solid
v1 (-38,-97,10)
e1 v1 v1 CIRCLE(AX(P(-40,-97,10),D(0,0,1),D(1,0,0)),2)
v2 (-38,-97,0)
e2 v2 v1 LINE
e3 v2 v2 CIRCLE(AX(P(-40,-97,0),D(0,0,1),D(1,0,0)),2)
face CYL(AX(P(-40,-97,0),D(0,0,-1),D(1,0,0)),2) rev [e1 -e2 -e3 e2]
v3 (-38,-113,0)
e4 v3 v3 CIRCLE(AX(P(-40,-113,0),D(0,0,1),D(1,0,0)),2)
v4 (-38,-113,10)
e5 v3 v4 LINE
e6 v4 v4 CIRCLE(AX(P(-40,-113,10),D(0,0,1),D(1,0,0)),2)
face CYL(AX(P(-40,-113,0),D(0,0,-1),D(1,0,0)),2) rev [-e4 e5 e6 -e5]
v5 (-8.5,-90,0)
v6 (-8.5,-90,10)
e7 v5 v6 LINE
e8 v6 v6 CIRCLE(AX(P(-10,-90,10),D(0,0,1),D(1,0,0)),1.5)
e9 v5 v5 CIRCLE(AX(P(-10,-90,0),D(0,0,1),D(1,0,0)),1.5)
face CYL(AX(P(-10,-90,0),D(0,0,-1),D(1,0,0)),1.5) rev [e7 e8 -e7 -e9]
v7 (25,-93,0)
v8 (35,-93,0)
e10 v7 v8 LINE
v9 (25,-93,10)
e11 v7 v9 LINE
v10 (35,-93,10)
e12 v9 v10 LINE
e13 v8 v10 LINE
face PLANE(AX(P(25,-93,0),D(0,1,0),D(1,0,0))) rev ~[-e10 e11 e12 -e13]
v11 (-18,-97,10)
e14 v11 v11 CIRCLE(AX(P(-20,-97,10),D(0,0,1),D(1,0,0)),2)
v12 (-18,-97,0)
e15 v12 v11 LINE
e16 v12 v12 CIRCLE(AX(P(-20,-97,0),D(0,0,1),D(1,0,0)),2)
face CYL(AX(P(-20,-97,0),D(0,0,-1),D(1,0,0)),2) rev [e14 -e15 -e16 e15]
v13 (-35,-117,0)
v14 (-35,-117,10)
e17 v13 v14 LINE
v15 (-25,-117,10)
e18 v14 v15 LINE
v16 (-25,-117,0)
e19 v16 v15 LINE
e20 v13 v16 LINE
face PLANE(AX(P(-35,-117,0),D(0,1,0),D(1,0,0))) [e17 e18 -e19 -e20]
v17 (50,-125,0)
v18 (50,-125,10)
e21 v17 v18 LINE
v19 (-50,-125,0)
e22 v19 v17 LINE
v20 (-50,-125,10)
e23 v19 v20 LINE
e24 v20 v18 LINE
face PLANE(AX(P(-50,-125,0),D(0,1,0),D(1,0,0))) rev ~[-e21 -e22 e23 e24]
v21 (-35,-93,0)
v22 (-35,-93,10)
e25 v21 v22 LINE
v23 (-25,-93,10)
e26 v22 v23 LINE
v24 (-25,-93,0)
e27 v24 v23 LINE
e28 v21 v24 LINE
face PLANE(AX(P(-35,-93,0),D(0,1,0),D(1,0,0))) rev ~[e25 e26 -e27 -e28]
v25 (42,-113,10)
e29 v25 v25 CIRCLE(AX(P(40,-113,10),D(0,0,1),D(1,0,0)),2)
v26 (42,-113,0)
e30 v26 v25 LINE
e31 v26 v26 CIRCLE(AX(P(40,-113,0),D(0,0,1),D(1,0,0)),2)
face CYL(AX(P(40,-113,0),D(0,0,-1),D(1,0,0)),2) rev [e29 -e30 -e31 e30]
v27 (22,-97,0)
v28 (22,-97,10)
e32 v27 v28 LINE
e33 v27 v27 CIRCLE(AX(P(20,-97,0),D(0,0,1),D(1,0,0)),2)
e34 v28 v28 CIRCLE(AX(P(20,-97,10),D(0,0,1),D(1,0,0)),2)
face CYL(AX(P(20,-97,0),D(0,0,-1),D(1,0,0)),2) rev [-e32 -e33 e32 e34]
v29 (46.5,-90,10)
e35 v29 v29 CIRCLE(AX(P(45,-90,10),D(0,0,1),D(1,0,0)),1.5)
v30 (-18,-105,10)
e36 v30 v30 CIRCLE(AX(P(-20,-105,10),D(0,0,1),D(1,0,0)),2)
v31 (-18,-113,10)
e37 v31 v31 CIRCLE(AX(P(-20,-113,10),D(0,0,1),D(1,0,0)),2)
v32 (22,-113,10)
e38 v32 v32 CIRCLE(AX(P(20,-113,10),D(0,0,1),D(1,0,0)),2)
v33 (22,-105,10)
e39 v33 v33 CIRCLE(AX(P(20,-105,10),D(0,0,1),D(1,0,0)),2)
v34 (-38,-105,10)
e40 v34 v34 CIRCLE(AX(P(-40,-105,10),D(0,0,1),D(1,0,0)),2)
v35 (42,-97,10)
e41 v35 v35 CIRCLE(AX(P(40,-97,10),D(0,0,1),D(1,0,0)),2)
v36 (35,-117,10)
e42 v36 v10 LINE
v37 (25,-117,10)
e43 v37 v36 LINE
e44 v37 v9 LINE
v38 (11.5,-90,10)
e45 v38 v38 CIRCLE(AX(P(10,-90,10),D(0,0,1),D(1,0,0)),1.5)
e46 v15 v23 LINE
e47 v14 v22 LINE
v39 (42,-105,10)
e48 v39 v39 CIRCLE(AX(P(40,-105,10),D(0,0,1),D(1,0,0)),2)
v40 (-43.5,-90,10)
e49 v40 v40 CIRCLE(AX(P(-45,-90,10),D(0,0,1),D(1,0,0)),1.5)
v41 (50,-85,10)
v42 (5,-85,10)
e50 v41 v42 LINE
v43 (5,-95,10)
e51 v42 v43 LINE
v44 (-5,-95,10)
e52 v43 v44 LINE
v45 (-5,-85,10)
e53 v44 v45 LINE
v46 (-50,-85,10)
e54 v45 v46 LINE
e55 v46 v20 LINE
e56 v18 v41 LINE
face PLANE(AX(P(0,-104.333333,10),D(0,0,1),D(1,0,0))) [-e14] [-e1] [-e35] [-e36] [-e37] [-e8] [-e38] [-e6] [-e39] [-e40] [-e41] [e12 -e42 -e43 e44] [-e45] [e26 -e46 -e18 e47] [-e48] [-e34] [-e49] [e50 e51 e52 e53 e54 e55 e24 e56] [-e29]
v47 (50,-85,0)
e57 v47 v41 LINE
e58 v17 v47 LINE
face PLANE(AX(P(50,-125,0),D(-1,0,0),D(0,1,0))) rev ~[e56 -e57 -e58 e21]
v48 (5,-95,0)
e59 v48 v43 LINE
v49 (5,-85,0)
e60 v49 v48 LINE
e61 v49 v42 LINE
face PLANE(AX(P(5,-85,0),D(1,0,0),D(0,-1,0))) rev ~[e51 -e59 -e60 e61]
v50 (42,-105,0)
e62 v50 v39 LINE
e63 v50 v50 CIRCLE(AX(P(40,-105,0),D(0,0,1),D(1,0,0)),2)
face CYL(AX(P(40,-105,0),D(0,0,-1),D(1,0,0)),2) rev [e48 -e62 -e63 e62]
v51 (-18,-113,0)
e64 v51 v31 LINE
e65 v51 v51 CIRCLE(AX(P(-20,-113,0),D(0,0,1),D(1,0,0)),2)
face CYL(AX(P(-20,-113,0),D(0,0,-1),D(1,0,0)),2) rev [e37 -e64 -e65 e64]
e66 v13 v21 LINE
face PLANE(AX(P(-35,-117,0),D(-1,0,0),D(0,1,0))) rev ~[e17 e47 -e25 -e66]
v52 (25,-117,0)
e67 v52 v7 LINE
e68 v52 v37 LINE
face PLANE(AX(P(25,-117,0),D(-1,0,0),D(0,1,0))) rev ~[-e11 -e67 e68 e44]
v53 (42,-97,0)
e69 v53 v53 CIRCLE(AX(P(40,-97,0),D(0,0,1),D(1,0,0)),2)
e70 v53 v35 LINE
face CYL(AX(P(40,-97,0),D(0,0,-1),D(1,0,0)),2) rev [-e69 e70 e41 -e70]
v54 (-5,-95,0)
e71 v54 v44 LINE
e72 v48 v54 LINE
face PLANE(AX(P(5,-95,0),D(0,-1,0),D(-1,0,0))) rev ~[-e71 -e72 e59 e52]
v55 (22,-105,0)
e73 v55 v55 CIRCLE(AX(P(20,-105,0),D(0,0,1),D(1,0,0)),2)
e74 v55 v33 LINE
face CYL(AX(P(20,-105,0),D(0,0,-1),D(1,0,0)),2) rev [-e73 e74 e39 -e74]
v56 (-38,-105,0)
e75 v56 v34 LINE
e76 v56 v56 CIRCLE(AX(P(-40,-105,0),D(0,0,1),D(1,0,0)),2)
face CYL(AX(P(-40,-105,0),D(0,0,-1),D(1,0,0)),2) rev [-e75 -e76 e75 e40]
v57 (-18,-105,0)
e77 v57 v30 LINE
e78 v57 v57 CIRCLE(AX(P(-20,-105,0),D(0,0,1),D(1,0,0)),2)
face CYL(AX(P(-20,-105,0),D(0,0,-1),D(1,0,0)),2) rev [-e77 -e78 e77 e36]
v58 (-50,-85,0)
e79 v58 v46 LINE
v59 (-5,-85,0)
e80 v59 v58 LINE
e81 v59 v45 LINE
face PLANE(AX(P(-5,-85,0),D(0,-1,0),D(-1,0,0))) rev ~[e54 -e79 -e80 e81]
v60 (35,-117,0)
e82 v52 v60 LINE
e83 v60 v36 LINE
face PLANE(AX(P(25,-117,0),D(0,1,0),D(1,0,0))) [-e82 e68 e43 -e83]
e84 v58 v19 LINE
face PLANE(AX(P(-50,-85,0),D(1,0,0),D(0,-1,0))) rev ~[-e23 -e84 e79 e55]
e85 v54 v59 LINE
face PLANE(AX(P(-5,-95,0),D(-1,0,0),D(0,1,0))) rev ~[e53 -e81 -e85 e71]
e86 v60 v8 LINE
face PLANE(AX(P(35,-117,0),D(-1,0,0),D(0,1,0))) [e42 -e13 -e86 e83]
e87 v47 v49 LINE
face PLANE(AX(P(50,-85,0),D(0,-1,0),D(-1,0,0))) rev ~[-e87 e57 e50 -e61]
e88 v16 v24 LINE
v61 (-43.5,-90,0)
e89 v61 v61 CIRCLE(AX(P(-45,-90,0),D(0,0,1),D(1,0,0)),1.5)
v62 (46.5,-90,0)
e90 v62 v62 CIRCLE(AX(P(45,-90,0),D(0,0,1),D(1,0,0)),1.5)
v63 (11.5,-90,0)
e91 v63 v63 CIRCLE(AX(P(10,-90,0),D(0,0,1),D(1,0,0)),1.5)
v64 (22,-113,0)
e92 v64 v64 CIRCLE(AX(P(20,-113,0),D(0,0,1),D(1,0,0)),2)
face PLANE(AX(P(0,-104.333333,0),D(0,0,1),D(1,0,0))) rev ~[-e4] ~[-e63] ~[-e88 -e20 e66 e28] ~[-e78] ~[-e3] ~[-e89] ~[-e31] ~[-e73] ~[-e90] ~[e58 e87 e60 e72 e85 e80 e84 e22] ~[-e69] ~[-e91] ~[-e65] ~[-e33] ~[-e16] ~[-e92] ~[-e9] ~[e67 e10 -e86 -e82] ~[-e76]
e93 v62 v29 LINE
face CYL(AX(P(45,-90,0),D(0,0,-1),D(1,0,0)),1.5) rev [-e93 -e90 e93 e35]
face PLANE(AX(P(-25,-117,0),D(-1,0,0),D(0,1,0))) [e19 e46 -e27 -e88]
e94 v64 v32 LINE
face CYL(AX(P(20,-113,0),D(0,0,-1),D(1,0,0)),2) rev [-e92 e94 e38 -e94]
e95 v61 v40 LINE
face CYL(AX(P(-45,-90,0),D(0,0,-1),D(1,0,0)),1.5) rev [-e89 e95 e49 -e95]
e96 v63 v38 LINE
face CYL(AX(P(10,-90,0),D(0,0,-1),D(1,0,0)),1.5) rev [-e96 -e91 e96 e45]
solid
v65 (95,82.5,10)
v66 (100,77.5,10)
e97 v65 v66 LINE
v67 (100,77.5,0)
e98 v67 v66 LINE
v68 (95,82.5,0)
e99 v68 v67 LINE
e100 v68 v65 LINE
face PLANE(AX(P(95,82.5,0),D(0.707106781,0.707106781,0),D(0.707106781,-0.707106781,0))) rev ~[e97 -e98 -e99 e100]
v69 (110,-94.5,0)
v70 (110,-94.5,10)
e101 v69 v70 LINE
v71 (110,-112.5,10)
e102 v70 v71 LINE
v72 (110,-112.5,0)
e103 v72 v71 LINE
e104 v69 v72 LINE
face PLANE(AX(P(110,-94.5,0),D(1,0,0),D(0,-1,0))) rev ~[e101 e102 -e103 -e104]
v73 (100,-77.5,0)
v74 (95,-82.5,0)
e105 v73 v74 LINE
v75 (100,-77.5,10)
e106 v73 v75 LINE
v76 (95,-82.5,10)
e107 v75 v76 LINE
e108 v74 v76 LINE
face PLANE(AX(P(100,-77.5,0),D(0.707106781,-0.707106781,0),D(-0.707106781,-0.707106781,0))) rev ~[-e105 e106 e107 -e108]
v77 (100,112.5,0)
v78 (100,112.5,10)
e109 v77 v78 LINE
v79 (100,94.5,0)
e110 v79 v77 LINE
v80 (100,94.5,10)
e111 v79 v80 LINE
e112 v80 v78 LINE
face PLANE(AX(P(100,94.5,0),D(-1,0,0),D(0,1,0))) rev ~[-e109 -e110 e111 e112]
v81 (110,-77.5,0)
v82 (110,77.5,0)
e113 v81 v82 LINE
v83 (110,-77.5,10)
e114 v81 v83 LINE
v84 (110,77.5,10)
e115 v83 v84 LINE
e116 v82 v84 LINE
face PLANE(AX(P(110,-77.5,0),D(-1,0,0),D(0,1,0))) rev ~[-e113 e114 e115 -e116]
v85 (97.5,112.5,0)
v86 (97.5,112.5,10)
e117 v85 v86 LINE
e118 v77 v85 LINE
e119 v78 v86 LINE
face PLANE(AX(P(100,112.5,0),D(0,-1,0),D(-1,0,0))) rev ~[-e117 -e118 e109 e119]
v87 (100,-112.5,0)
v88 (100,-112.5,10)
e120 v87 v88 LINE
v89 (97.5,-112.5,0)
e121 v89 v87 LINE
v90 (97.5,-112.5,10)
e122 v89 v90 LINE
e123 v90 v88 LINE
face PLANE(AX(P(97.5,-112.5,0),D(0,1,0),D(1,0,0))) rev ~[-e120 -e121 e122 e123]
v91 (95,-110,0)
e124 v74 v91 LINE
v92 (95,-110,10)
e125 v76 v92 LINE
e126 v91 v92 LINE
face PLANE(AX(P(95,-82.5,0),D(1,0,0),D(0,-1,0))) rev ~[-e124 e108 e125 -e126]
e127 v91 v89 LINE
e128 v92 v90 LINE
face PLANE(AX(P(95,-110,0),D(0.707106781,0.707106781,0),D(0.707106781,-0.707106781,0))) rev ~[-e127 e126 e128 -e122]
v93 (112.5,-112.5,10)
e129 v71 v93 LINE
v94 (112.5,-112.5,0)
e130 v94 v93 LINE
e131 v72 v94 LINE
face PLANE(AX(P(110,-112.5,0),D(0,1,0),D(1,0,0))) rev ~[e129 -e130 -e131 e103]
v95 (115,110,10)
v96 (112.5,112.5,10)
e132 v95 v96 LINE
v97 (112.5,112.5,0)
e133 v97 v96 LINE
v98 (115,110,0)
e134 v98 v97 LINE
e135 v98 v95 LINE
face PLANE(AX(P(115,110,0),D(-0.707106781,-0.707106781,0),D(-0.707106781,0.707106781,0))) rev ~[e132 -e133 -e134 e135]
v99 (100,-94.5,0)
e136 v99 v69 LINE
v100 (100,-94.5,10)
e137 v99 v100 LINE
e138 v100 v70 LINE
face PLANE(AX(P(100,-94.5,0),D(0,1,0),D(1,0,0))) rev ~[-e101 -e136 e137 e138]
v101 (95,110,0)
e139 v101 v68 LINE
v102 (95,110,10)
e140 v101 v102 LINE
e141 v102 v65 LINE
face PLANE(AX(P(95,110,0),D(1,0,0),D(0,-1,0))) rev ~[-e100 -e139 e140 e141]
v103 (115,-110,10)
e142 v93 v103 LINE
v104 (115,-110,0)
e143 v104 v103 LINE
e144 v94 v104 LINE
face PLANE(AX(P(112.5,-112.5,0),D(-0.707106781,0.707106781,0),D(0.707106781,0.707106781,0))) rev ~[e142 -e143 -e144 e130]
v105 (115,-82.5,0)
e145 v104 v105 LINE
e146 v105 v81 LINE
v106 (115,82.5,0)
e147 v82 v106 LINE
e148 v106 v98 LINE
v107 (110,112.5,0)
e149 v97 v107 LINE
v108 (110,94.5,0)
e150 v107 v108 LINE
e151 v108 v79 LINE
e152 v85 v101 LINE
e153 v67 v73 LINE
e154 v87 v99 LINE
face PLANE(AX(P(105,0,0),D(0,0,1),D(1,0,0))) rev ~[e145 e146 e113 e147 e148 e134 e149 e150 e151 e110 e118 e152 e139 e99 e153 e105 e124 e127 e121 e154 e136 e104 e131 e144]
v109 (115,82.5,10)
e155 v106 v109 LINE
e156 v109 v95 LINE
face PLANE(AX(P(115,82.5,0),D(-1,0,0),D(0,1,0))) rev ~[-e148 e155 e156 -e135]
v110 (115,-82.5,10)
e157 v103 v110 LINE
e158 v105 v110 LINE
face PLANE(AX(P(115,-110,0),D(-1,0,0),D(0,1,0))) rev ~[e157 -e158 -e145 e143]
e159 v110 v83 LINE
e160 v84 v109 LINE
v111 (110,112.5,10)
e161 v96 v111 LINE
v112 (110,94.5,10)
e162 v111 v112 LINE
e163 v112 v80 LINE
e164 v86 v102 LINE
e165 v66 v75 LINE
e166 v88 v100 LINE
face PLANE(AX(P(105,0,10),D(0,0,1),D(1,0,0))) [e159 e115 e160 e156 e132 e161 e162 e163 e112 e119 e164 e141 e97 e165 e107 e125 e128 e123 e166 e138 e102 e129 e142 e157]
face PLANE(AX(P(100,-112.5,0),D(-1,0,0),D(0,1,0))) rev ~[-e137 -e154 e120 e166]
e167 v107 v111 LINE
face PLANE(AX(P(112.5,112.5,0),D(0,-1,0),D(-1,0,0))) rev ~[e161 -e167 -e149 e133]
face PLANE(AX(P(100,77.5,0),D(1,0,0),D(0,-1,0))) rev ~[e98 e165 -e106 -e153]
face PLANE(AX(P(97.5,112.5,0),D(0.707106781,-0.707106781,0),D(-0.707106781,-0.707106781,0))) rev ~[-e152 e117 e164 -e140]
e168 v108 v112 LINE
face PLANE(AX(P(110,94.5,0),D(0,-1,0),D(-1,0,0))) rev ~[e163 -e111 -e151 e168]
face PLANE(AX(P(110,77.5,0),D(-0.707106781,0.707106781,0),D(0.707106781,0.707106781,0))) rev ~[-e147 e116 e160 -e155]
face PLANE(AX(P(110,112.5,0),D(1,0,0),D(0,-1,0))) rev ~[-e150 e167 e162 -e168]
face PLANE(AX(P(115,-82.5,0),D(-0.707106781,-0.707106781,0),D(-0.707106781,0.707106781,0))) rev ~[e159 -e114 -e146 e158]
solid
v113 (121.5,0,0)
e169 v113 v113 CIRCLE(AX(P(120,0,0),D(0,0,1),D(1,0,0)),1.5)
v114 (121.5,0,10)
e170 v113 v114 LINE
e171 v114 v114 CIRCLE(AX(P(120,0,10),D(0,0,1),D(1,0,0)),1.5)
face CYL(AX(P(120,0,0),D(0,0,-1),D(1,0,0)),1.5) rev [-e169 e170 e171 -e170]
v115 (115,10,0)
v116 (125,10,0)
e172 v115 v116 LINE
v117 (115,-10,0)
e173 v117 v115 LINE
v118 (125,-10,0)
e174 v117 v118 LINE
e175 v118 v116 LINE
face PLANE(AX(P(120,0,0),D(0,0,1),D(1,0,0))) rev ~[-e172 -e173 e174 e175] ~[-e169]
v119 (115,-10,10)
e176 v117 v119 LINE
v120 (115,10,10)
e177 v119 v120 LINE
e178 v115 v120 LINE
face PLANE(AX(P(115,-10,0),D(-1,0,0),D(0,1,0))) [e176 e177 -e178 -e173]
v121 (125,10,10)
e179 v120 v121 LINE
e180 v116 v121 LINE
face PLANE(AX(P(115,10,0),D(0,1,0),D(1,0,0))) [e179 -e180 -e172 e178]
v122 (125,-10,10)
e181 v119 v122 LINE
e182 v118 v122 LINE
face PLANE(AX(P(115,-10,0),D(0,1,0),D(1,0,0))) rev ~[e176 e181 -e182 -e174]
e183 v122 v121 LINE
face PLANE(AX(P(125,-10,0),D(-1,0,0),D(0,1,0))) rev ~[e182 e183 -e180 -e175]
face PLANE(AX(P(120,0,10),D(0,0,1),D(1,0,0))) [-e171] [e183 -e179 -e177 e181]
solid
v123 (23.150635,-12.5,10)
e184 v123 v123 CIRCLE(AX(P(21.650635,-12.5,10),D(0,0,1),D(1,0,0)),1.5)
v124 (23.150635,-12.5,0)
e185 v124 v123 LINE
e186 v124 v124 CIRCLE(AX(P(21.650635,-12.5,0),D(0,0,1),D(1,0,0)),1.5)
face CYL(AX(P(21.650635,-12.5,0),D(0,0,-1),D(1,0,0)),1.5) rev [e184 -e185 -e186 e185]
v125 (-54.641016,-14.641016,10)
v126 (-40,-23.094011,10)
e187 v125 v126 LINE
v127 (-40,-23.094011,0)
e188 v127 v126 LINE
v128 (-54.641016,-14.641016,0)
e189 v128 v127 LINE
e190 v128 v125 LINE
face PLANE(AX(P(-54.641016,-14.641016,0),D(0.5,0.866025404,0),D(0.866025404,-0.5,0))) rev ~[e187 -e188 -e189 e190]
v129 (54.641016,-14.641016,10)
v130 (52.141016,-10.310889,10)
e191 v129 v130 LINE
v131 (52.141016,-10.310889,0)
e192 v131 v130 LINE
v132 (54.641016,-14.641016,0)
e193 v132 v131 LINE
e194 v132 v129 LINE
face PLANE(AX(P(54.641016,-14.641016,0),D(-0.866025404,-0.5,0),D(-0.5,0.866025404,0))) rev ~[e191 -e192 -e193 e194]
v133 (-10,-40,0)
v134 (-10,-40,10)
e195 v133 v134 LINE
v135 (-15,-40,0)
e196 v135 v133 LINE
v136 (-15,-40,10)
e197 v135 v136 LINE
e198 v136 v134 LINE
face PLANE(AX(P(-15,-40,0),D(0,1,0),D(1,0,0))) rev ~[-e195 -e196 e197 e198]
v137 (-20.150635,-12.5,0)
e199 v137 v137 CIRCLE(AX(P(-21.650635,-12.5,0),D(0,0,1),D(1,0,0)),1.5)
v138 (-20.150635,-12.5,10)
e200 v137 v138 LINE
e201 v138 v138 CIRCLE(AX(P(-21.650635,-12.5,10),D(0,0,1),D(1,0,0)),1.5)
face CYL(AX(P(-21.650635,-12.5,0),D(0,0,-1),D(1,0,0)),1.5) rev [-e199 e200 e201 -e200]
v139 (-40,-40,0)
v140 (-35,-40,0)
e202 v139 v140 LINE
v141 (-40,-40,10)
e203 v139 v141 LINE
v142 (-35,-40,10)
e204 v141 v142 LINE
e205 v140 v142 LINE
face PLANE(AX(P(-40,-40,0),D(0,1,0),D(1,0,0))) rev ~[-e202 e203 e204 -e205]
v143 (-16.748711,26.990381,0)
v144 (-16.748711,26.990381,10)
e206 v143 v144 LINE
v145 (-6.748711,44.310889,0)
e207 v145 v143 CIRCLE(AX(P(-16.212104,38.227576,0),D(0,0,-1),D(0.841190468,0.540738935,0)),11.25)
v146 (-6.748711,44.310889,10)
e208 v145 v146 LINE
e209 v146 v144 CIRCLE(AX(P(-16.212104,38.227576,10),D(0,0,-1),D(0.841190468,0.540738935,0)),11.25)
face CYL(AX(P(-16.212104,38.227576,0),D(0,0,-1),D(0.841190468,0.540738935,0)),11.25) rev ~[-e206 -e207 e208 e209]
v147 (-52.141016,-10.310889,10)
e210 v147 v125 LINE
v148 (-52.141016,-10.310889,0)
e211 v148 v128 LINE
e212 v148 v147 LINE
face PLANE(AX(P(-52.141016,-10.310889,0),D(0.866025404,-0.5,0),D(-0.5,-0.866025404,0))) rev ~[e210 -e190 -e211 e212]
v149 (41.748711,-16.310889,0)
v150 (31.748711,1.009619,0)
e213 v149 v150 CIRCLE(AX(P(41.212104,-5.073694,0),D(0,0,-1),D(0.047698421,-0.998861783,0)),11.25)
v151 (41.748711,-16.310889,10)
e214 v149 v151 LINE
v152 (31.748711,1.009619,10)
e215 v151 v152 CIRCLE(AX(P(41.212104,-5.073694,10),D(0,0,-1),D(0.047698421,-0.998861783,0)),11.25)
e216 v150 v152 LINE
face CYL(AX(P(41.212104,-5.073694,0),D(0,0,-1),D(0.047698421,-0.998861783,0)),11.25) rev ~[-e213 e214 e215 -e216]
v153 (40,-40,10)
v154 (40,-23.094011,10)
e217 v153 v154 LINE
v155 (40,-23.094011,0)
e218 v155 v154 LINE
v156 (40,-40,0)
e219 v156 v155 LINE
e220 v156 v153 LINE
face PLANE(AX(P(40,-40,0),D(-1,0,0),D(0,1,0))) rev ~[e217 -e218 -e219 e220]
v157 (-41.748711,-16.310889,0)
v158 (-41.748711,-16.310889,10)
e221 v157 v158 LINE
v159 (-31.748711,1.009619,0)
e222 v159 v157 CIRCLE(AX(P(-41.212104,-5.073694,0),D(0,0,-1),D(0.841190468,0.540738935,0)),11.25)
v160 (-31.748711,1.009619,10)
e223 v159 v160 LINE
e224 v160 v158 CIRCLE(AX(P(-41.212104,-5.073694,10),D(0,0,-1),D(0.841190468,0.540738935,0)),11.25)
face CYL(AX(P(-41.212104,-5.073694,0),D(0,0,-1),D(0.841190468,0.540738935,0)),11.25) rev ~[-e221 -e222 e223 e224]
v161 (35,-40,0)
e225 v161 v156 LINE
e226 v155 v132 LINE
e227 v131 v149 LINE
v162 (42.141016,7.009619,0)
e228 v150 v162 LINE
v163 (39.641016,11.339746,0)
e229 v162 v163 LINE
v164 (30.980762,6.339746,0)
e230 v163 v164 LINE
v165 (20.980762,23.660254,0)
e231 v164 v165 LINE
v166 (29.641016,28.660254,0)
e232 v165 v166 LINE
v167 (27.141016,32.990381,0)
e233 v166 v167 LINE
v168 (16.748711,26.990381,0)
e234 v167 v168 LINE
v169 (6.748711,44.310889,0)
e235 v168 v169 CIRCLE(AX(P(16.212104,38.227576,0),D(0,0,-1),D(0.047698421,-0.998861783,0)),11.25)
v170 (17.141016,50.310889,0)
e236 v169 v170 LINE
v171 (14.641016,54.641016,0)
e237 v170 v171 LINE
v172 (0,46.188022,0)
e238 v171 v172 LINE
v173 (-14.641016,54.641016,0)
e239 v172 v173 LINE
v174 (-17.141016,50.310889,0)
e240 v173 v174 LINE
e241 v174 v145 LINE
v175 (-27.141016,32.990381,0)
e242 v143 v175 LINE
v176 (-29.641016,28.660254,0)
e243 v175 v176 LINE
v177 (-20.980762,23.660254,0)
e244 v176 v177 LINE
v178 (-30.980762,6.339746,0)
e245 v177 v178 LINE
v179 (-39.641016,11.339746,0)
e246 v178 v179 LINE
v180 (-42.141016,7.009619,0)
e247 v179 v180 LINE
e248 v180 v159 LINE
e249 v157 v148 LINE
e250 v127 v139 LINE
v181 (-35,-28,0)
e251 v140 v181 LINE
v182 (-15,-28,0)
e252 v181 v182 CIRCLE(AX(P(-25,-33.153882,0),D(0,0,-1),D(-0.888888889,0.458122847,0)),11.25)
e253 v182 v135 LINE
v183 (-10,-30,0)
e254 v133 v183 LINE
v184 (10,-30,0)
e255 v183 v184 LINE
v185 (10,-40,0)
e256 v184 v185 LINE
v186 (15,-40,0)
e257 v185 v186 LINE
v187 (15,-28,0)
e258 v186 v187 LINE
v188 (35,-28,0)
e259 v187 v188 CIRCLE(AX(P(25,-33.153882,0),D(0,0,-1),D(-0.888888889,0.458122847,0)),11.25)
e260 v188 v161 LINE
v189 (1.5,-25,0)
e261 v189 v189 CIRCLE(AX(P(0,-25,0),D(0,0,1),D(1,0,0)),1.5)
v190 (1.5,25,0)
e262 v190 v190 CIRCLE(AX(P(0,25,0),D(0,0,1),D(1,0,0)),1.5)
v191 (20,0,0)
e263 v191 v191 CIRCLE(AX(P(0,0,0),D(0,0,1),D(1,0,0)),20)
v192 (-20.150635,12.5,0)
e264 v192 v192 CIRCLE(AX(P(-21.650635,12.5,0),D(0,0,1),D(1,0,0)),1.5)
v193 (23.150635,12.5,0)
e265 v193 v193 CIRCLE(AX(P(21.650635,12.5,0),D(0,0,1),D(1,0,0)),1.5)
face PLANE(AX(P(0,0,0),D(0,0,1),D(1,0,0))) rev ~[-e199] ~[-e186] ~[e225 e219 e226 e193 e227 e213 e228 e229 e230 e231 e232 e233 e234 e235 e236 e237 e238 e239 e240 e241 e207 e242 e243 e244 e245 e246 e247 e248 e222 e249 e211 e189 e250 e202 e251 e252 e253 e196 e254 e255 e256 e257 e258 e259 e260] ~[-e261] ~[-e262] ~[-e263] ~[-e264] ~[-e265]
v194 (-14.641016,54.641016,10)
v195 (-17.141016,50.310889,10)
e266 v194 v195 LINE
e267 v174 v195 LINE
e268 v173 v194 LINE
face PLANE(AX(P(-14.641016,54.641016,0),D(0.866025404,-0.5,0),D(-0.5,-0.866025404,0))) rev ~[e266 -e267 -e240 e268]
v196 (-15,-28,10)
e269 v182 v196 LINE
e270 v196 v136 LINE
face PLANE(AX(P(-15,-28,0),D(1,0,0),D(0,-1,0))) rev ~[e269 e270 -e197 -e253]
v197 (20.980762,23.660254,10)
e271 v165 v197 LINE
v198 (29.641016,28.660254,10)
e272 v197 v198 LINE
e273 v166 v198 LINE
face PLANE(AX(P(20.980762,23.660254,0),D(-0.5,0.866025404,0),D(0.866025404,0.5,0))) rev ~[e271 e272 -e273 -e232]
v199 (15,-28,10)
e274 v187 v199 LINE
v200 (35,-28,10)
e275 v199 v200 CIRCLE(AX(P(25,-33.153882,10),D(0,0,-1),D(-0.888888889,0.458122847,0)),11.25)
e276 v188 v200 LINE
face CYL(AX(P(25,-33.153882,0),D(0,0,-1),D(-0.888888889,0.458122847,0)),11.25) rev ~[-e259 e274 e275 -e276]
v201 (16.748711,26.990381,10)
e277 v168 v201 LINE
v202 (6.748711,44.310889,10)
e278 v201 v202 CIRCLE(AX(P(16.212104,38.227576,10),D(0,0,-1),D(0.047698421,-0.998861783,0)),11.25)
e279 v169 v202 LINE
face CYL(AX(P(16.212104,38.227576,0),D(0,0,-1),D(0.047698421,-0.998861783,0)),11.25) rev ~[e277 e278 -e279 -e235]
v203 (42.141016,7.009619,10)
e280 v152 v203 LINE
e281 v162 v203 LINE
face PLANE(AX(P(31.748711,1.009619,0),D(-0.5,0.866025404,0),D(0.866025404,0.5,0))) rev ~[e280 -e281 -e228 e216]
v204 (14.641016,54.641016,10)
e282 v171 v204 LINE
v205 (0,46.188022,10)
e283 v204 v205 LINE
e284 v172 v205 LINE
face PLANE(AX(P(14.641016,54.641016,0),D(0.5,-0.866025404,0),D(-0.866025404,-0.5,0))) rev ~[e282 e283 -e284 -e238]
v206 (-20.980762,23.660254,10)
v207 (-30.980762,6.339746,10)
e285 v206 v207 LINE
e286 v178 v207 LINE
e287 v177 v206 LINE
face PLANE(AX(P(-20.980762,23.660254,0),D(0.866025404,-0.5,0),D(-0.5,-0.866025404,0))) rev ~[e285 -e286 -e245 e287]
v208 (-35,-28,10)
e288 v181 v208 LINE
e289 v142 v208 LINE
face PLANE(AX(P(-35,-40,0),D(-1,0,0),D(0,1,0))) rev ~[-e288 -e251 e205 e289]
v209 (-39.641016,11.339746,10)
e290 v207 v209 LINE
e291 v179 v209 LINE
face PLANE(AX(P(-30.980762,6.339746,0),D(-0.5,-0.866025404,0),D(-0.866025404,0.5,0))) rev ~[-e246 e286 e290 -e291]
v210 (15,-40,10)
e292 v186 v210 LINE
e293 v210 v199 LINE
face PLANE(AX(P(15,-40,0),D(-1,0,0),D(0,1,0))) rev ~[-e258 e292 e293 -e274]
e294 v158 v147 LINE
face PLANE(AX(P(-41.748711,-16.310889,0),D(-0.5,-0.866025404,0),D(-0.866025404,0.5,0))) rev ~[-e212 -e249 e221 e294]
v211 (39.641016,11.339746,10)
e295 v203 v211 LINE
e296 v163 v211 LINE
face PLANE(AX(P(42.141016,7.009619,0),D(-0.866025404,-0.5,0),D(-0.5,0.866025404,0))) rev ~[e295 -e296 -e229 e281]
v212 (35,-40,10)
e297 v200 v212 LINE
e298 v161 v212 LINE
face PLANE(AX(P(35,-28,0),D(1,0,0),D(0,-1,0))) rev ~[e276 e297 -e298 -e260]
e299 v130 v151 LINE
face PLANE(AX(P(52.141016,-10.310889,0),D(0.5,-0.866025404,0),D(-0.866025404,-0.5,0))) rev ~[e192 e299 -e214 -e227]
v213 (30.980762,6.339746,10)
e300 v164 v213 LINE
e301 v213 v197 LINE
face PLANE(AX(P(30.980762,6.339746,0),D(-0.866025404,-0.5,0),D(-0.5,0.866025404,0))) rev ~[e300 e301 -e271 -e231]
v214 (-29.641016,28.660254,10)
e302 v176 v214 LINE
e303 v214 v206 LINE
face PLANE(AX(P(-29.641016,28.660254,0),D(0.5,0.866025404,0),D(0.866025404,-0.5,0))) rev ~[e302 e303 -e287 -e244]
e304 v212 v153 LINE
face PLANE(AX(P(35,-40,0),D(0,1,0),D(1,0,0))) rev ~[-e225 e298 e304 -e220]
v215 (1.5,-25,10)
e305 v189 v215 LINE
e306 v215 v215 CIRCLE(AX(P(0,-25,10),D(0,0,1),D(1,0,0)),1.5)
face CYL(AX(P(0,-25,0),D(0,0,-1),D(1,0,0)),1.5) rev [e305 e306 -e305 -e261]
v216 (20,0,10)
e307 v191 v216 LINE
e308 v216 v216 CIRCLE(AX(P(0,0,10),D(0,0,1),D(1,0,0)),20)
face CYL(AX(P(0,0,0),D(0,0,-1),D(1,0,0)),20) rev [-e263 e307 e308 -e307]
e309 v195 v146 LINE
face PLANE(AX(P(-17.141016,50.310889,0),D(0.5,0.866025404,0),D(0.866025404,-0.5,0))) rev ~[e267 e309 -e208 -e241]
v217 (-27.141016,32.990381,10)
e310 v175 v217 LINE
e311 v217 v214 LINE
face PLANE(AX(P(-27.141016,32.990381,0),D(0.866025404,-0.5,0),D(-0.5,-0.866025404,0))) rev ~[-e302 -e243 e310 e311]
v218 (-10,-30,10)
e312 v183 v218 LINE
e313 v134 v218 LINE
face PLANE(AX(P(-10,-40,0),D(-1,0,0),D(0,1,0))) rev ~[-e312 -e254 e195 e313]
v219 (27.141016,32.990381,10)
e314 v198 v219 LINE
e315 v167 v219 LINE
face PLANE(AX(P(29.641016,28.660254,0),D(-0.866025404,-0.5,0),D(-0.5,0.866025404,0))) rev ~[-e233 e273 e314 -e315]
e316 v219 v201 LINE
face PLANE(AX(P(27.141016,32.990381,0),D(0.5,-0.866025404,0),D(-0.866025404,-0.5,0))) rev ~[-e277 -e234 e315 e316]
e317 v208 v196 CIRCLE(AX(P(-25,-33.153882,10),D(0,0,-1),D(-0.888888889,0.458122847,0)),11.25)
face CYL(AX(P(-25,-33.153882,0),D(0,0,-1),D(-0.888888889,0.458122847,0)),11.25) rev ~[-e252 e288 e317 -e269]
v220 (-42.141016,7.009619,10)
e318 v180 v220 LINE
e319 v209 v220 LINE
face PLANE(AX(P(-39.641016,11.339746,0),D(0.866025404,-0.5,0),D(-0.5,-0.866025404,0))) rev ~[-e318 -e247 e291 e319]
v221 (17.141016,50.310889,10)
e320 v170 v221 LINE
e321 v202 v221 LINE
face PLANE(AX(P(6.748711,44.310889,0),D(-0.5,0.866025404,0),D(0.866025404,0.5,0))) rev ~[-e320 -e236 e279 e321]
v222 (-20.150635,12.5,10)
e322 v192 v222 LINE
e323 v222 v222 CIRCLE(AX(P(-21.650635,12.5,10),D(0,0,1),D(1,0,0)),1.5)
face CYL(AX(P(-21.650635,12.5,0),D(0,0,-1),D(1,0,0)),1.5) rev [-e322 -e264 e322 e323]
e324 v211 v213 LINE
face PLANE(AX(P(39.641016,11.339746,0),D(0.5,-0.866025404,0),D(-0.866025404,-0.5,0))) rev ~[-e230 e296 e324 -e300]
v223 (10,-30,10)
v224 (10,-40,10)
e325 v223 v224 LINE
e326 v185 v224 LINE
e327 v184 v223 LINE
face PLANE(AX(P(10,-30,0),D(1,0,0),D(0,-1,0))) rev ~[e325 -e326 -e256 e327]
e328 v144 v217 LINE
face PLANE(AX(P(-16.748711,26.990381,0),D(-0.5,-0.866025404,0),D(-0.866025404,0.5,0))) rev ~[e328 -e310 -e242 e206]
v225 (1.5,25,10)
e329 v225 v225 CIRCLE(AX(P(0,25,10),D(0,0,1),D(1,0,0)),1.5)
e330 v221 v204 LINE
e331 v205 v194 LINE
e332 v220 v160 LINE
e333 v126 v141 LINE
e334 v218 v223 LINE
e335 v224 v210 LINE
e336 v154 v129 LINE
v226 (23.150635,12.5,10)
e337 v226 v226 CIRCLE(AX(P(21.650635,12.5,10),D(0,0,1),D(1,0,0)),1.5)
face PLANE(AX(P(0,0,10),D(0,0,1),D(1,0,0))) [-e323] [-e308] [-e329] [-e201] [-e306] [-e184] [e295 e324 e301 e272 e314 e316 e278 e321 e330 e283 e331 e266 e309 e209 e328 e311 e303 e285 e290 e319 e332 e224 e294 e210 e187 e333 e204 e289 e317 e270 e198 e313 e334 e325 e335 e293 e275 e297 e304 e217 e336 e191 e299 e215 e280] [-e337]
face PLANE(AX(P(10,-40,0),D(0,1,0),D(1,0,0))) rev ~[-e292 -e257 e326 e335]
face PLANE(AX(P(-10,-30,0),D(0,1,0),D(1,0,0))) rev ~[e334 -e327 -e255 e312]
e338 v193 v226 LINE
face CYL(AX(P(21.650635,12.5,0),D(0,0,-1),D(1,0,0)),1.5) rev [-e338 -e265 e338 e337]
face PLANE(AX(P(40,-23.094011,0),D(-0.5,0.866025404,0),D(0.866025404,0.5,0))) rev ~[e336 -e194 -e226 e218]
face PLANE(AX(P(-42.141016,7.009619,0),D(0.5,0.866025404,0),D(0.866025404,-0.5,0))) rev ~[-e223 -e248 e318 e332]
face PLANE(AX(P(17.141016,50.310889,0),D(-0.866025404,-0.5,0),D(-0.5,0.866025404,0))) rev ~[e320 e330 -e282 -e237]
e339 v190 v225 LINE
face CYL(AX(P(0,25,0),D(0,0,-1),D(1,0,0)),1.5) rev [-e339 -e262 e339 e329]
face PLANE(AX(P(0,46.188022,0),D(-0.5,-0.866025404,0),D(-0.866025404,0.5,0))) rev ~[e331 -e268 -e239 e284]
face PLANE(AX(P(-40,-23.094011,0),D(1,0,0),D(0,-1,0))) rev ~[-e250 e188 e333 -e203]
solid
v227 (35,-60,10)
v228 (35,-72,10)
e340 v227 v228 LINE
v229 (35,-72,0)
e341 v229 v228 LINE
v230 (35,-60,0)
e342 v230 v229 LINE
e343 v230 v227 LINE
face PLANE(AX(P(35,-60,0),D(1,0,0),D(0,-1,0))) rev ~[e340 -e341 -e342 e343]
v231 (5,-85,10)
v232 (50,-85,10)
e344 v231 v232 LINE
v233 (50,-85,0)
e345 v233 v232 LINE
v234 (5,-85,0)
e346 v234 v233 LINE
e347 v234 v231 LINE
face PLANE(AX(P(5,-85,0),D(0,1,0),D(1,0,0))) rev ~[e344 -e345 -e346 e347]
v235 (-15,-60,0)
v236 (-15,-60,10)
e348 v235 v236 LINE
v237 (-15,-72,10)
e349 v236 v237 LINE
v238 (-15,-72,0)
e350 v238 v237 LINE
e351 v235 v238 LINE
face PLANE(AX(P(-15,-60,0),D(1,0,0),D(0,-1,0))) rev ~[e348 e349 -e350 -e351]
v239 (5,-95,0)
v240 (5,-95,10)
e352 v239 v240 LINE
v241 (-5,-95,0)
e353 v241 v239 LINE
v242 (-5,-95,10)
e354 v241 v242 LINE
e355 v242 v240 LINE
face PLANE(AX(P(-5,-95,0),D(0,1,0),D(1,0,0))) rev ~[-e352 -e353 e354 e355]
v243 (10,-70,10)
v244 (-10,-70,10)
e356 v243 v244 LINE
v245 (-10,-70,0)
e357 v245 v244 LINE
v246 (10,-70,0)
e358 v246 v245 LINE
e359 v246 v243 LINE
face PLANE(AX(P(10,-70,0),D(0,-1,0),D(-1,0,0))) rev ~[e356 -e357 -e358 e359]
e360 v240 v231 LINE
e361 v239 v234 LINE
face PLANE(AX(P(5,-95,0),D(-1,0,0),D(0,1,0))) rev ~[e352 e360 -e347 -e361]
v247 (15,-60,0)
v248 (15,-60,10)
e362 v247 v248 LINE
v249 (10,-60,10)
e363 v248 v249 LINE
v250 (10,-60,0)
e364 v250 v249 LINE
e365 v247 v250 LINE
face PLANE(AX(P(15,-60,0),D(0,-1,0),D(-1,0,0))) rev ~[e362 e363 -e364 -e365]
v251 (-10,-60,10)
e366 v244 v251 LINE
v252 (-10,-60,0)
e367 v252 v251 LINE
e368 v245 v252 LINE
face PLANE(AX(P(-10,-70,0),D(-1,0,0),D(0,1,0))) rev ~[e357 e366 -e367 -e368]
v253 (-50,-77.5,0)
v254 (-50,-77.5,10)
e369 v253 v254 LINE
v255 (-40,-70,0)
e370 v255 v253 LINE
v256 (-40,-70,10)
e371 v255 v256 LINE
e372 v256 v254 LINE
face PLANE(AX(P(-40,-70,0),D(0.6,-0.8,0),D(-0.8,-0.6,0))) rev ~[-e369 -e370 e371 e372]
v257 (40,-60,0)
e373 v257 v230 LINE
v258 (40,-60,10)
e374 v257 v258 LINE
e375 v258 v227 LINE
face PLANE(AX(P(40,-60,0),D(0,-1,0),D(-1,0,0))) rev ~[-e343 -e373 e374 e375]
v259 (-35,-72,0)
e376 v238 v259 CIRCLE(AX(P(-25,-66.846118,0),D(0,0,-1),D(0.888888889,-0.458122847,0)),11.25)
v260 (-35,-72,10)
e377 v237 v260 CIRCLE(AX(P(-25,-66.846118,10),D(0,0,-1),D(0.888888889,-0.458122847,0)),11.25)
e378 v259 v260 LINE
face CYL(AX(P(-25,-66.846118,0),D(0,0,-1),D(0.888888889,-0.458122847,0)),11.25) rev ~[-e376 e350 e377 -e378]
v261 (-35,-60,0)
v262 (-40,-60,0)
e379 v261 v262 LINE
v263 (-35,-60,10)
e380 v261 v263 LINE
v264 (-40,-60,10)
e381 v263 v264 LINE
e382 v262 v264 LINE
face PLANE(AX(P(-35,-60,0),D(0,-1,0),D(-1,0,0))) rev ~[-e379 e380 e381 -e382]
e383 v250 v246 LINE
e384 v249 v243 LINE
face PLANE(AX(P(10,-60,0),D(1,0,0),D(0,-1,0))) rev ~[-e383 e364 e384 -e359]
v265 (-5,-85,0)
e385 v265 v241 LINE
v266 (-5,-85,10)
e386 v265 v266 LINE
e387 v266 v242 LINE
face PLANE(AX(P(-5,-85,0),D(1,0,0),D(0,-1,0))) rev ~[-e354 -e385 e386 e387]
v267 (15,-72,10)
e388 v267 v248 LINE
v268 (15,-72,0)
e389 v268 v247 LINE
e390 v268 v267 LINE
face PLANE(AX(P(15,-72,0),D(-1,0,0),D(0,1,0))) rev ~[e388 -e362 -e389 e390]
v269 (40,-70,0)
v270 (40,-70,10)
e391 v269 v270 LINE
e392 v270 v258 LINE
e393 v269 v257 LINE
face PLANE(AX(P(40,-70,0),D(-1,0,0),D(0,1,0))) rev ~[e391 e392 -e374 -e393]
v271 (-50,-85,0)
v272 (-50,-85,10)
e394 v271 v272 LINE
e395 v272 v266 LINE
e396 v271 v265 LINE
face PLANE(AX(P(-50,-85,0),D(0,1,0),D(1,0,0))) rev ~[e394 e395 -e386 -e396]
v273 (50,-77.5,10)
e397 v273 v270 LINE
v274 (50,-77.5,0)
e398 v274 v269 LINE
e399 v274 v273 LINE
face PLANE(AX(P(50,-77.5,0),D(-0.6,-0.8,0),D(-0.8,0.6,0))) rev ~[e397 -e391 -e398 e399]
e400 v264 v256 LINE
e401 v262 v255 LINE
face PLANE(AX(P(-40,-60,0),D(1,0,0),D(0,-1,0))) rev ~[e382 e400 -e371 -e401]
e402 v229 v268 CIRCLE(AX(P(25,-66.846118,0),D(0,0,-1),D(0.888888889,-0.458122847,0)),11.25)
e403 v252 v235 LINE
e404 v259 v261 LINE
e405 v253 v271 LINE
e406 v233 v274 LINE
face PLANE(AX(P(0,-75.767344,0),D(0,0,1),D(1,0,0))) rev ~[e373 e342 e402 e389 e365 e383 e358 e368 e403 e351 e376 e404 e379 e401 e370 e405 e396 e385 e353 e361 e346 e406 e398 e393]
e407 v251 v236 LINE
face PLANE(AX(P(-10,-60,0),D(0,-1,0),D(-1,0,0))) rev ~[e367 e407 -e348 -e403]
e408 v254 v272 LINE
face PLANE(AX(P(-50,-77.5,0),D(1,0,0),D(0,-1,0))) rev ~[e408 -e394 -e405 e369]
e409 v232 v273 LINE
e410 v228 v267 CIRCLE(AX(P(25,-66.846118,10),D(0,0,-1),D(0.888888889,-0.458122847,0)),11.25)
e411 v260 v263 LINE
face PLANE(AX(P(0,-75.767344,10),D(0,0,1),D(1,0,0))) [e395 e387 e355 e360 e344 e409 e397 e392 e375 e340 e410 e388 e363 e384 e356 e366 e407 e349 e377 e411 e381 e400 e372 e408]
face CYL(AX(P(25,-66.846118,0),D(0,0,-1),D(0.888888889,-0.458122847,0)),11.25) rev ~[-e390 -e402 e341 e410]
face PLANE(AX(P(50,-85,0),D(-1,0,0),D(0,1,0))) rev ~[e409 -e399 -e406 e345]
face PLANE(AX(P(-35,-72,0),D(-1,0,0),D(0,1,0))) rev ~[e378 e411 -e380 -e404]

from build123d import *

# Parameters (mm, degrees)
F0_R     = 1.5
F0_R_2   = 20
F1_DEPTH = 10
F0_R_3   = 2
F0_W     = 10
F0_H     = 24
F0_H_2   = 20
F2_DEPTH = 10


# Not quite as in the source:
# - a feature names something its author has since deleted; it is built from what else it names


with BuildPart() as f1:
    # F0 (on Top) → F1 (new body)
    with BuildSketch(Plane.XY):
        with BuildLine():
            Line((-10, -30), (0, -30))
            Line((0, -30), (10, -30))
            Line((10, -30), (10, -40))
            Line((10, -40), (15, -40))
            Line((15, -40), (15, -28))
            ThreePointArc((15, -28), (25, -21.903882032), (35, -28))
            Line((35, -28), (35, -40))
            Line((35, -40), (40, -40))
            Line((40, -40), (40, -23.0940107676))
            Line((40, -23.0940107676), (54.6410161514, -14.6410161514))
            Line((54.6410161514, -14.6410161514), (52.1410161514, -10.3108891325))
            Line((52.1410161514, -10.3108891325), (41.748711306, -16.3108891325))
            ThreePointArc((41.748711306, -16.3108891325), (31.4693182812, -10.6986940786), (31.748711306, 1.0096189432))
            Line((31.748711306, 1.0096189432), (42.1410161514, 7.0096189432))
            Line((42.1410161514, 7.0096189432), (39.6410161514, 11.3397459622))
            Line((39.6410161514, 11.3397459622), (30.9807621135, 6.3397459622))
            Line((30.9807621135, 6.3397459622), (25.9807621135, 15))
            Line((25.9807621135, 15), (20.9807621135, 23.6602540378))
            Line((20.9807621135, 23.6602540378), (29.6410161514, 28.6602540378))
            Line((29.6410161514, 28.6602540378), (27.1410161514, 32.9903810568))
            Line((27.1410161514, 32.9903810568), (16.748711306, 26.9903810568))
            ThreePointArc((16.748711306, 26.9903810568), (6.4693182812, 32.6025761106), (6.748711306, 44.3108891325))
            Line((6.748711306, 44.3108891325), (17.1410161514, 50.3108891325))
            Line((17.1410161514, 50.3108891325), (14.6410161514, 54.6410161514))
            Line((14.6410161514, 54.6410161514), (0, 46.1880215352))
            Line((0, 46.1880215352), (-14.6410161514, 54.6410161514))
            Line((-14.6410161514, 54.6410161514), (-17.1410161514, 50.3108891325))
            Line((-17.1410161514, 50.3108891325), (-6.748711306, 44.3108891325))
            ThreePointArc((-6.748711306, 44.3108891325), (-6.4693182812, 32.6025761106), (-16.748711306, 26.9903810568))
            Line((-16.748711306, 26.9903810568), (-27.1410161514, 32.9903810568))
            Line((-27.1410161514, 32.9903810568), (-29.6410161514, 28.6602540378))
            Line((-29.6410161514, 28.6602540378), (-20.9807621135, 23.6602540378))
            Line((-20.9807621135, 23.6602540378), (-25.9807621135, 15))
            Line((-25.9807621135, 15), (-30.9807621135, 6.3397459622))
            Line((-30.9807621135, 6.3397459622), (-39.6410161514, 11.3397459622))
            Line((-39.6410161514, 11.3397459622), (-42.1410161514, 7.0096189432))
            Line((-42.1410161514, 7.0096189432), (-31.748711306, 1.0096189432))
            ThreePointArc((-31.748711306, 1.0096189432), (-31.4693182812, -10.6986940786), (-41.748711306, -16.3108891325))
            Line((-41.748711306, -16.3108891325), (-52.1410161514, -10.3108891325))
            Line((-52.1410161514, -10.3108891325), (-54.6410161514, -14.6410161514))
            Line((-54.6410161514, -14.6410161514), (-40, -23.0940107676))
            Line((-40, -23.0940107676), (-40, -40))
            Line((-40, -40), (-35, -40))
            Line((-35, -40), (-35, -28))
            ThreePointArc((-35, -28), (-25, -21.903882032), (-15, -28))
            Line((-15, -28), (-15, -40))
            Line((-15, -40), (-10, -40))
            Line((-10, -40), (-10, -30))
        make_face()
        with Locations((-21.6506350946, -12.5)):
            Circle(F0_R, mode=Mode.SUBTRACT)
        with Locations((0, -25)):
            Circle(F0_R, mode=Mode.SUBTRACT)
        with Locations((21.6506350946, -12.5)):
            Circle(F0_R, mode=Mode.SUBTRACT)
        with Locations((-21.6506350946, 12.5)):
            Circle(F0_R, mode=Mode.SUBTRACT)
        Circle(F0_R_2, mode=Mode.SUBTRACT)
        with Locations((21.6506350946, 12.5)):
            Circle(F0_R, mode=Mode.SUBTRACT)
        with Locations((0, 25)):
            Circle(F0_R, mode=Mode.SUBTRACT)
    extrude(amount=F1_DEPTH)


with BuildPart() as f1b:
    # F0 (on Top) → F1, piece 2 (new body)
    with BuildSketch(Plane.XY):
        Polygon((-5, -85), (-50, -85), (-50, -125), (50, -125), (50, -85), (5, -85), (5, -95), (0, -95), (-5, -95), align=None)
        with Locations((-40, -113)):
            Circle(F0_R_3, mode=Mode.SUBTRACT)
        with Locations((-40, -105)):
            Circle(F0_R_3, mode=Mode.SUBTRACT)
        with Locations((-40, -97)):
            Circle(F0_R_3, mode=Mode.SUBTRACT)
        with Locations((-20, -113)):
            Circle(F0_R_3, mode=Mode.SUBTRACT)
        with Locations((-30, -105)):
            Rectangle(F0_W, F0_H, mode=Mode.SUBTRACT)
        with Locations((-20, -105)):
            Circle(F0_R_3, mode=Mode.SUBTRACT)
        with Locations((-20, -97)):
            Circle(F0_R_3, mode=Mode.SUBTRACT)
        with Locations((-45, -90)):
            Circle(F0_R, mode=Mode.SUBTRACT)
        with Locations((-10, -90)):
            Circle(F0_R, mode=Mode.SUBTRACT)
        with Locations((20, -113)):
            Circle(F0_R_3, mode=Mode.SUBTRACT)
        with Locations((20, -105)):
            Circle(F0_R_3, mode=Mode.SUBTRACT)
        with Locations((20, -97)):
            Circle(F0_R_3, mode=Mode.SUBTRACT)
        with Locations((30, -105)):
            Rectangle(F0_W, F0_H, mode=Mode.SUBTRACT)
        with Locations((10, -90)):
            Circle(F0_R, mode=Mode.SUBTRACT)
        with Locations((40, -113)):
            Circle(F0_R_3, mode=Mode.SUBTRACT)
        with Locations((40, -105)):
            Circle(F0_R_3, mode=Mode.SUBTRACT)
        with Locations((40, -97)):
            Circle(F0_R_3, mode=Mode.SUBTRACT)
        with Locations((45, -90)):
            Circle(F0_R, mode=Mode.SUBTRACT)
    extrude(amount=F1_DEPTH)


with BuildPart() as f1c:
    # F0 (on Top) → F1, piece 3 (new body)
    with BuildSketch(Plane.XY):
        Polygon((100, 77.5), (100, 0), (100, -77.5), (95, -82.5), (95, -110), (97.5, -112.5), (100, -112.5), (100, -94.5), (110, -94.5), (110, -112.5), (112.5, -112.5), (115, -110), (115, -82.5), (110, -77.5), (110, 0), (110, 77.5), (115, 82.5), (115, 110), (112.5, 112.5), (110, 112.5), (110, 94.5), (100, 94.5), (100, 112.5), (97.5, 112.5), (95, 110), (95, 82.5), align=None)
    extrude(amount=F1_DEPTH)


with BuildPart() as f1d:
    # F0 (on Top) → F1, piece 4 (new body)
    with BuildSketch(Plane.XY):
        with Locations((120, 0)):
            Rectangle(F0_W, F0_H_2)
        with Locations((120, 0)):
            Circle(F0_R, mode=Mode.SUBTRACT)
    extrude(amount=F1_DEPTH)


with BuildPart() as f2:
    # F0 (on Top) → F2 (new body)
    with BuildSketch(Plane.XY):
        with BuildLine():
            Line((-35, -60), (-40, -60))
            Line((-40, -60), (-40, -70))
            Line((-40, -70), (-50, -77.5))
            Line((-50, -77.5), (-50, -85))
            Line((-50, -85), (-5, -85))
            Line((-5, -85), (-5, -95))
            Line((-5, -95), (0, -95))
            Line((0, -95), (5, -95))
            Line((5, -95), (5, -85))
            Line((5, -85), (50, -85))
            Line((50, -85), (50, -77.5))
            Line((50, -77.5), (40, -70))
            Line((40, -70), (40, -60))
            Line((40, -60), (35, -60))
            Line((35, -60), (35, -72))
            ThreePointArc((35, -72), (25, -78.096117968), (15, -72))
            Line((15, -72), (15, -60))
            Line((15, -60), (10, -60))
            Line((10, -60), (10, -70))
            Line((10, -70), (0, -70))
            Line((0, -70), (-10, -70))
            Line((-10, -70), (-10, -60))
            Line((-10, -60), (-15, -60))
            Line((-15, -60), (-15, -72))
            ThreePointArc((-15, -72), (-25, -78.096117968), (-35, -72))
            Line((-35, -72), (-35, -60))
        make_face()
    extrude(amount=F2_DEPTH)


solid = Compound([f1.part, f1b.part, f1c.part, f1d.part, f2.part])
